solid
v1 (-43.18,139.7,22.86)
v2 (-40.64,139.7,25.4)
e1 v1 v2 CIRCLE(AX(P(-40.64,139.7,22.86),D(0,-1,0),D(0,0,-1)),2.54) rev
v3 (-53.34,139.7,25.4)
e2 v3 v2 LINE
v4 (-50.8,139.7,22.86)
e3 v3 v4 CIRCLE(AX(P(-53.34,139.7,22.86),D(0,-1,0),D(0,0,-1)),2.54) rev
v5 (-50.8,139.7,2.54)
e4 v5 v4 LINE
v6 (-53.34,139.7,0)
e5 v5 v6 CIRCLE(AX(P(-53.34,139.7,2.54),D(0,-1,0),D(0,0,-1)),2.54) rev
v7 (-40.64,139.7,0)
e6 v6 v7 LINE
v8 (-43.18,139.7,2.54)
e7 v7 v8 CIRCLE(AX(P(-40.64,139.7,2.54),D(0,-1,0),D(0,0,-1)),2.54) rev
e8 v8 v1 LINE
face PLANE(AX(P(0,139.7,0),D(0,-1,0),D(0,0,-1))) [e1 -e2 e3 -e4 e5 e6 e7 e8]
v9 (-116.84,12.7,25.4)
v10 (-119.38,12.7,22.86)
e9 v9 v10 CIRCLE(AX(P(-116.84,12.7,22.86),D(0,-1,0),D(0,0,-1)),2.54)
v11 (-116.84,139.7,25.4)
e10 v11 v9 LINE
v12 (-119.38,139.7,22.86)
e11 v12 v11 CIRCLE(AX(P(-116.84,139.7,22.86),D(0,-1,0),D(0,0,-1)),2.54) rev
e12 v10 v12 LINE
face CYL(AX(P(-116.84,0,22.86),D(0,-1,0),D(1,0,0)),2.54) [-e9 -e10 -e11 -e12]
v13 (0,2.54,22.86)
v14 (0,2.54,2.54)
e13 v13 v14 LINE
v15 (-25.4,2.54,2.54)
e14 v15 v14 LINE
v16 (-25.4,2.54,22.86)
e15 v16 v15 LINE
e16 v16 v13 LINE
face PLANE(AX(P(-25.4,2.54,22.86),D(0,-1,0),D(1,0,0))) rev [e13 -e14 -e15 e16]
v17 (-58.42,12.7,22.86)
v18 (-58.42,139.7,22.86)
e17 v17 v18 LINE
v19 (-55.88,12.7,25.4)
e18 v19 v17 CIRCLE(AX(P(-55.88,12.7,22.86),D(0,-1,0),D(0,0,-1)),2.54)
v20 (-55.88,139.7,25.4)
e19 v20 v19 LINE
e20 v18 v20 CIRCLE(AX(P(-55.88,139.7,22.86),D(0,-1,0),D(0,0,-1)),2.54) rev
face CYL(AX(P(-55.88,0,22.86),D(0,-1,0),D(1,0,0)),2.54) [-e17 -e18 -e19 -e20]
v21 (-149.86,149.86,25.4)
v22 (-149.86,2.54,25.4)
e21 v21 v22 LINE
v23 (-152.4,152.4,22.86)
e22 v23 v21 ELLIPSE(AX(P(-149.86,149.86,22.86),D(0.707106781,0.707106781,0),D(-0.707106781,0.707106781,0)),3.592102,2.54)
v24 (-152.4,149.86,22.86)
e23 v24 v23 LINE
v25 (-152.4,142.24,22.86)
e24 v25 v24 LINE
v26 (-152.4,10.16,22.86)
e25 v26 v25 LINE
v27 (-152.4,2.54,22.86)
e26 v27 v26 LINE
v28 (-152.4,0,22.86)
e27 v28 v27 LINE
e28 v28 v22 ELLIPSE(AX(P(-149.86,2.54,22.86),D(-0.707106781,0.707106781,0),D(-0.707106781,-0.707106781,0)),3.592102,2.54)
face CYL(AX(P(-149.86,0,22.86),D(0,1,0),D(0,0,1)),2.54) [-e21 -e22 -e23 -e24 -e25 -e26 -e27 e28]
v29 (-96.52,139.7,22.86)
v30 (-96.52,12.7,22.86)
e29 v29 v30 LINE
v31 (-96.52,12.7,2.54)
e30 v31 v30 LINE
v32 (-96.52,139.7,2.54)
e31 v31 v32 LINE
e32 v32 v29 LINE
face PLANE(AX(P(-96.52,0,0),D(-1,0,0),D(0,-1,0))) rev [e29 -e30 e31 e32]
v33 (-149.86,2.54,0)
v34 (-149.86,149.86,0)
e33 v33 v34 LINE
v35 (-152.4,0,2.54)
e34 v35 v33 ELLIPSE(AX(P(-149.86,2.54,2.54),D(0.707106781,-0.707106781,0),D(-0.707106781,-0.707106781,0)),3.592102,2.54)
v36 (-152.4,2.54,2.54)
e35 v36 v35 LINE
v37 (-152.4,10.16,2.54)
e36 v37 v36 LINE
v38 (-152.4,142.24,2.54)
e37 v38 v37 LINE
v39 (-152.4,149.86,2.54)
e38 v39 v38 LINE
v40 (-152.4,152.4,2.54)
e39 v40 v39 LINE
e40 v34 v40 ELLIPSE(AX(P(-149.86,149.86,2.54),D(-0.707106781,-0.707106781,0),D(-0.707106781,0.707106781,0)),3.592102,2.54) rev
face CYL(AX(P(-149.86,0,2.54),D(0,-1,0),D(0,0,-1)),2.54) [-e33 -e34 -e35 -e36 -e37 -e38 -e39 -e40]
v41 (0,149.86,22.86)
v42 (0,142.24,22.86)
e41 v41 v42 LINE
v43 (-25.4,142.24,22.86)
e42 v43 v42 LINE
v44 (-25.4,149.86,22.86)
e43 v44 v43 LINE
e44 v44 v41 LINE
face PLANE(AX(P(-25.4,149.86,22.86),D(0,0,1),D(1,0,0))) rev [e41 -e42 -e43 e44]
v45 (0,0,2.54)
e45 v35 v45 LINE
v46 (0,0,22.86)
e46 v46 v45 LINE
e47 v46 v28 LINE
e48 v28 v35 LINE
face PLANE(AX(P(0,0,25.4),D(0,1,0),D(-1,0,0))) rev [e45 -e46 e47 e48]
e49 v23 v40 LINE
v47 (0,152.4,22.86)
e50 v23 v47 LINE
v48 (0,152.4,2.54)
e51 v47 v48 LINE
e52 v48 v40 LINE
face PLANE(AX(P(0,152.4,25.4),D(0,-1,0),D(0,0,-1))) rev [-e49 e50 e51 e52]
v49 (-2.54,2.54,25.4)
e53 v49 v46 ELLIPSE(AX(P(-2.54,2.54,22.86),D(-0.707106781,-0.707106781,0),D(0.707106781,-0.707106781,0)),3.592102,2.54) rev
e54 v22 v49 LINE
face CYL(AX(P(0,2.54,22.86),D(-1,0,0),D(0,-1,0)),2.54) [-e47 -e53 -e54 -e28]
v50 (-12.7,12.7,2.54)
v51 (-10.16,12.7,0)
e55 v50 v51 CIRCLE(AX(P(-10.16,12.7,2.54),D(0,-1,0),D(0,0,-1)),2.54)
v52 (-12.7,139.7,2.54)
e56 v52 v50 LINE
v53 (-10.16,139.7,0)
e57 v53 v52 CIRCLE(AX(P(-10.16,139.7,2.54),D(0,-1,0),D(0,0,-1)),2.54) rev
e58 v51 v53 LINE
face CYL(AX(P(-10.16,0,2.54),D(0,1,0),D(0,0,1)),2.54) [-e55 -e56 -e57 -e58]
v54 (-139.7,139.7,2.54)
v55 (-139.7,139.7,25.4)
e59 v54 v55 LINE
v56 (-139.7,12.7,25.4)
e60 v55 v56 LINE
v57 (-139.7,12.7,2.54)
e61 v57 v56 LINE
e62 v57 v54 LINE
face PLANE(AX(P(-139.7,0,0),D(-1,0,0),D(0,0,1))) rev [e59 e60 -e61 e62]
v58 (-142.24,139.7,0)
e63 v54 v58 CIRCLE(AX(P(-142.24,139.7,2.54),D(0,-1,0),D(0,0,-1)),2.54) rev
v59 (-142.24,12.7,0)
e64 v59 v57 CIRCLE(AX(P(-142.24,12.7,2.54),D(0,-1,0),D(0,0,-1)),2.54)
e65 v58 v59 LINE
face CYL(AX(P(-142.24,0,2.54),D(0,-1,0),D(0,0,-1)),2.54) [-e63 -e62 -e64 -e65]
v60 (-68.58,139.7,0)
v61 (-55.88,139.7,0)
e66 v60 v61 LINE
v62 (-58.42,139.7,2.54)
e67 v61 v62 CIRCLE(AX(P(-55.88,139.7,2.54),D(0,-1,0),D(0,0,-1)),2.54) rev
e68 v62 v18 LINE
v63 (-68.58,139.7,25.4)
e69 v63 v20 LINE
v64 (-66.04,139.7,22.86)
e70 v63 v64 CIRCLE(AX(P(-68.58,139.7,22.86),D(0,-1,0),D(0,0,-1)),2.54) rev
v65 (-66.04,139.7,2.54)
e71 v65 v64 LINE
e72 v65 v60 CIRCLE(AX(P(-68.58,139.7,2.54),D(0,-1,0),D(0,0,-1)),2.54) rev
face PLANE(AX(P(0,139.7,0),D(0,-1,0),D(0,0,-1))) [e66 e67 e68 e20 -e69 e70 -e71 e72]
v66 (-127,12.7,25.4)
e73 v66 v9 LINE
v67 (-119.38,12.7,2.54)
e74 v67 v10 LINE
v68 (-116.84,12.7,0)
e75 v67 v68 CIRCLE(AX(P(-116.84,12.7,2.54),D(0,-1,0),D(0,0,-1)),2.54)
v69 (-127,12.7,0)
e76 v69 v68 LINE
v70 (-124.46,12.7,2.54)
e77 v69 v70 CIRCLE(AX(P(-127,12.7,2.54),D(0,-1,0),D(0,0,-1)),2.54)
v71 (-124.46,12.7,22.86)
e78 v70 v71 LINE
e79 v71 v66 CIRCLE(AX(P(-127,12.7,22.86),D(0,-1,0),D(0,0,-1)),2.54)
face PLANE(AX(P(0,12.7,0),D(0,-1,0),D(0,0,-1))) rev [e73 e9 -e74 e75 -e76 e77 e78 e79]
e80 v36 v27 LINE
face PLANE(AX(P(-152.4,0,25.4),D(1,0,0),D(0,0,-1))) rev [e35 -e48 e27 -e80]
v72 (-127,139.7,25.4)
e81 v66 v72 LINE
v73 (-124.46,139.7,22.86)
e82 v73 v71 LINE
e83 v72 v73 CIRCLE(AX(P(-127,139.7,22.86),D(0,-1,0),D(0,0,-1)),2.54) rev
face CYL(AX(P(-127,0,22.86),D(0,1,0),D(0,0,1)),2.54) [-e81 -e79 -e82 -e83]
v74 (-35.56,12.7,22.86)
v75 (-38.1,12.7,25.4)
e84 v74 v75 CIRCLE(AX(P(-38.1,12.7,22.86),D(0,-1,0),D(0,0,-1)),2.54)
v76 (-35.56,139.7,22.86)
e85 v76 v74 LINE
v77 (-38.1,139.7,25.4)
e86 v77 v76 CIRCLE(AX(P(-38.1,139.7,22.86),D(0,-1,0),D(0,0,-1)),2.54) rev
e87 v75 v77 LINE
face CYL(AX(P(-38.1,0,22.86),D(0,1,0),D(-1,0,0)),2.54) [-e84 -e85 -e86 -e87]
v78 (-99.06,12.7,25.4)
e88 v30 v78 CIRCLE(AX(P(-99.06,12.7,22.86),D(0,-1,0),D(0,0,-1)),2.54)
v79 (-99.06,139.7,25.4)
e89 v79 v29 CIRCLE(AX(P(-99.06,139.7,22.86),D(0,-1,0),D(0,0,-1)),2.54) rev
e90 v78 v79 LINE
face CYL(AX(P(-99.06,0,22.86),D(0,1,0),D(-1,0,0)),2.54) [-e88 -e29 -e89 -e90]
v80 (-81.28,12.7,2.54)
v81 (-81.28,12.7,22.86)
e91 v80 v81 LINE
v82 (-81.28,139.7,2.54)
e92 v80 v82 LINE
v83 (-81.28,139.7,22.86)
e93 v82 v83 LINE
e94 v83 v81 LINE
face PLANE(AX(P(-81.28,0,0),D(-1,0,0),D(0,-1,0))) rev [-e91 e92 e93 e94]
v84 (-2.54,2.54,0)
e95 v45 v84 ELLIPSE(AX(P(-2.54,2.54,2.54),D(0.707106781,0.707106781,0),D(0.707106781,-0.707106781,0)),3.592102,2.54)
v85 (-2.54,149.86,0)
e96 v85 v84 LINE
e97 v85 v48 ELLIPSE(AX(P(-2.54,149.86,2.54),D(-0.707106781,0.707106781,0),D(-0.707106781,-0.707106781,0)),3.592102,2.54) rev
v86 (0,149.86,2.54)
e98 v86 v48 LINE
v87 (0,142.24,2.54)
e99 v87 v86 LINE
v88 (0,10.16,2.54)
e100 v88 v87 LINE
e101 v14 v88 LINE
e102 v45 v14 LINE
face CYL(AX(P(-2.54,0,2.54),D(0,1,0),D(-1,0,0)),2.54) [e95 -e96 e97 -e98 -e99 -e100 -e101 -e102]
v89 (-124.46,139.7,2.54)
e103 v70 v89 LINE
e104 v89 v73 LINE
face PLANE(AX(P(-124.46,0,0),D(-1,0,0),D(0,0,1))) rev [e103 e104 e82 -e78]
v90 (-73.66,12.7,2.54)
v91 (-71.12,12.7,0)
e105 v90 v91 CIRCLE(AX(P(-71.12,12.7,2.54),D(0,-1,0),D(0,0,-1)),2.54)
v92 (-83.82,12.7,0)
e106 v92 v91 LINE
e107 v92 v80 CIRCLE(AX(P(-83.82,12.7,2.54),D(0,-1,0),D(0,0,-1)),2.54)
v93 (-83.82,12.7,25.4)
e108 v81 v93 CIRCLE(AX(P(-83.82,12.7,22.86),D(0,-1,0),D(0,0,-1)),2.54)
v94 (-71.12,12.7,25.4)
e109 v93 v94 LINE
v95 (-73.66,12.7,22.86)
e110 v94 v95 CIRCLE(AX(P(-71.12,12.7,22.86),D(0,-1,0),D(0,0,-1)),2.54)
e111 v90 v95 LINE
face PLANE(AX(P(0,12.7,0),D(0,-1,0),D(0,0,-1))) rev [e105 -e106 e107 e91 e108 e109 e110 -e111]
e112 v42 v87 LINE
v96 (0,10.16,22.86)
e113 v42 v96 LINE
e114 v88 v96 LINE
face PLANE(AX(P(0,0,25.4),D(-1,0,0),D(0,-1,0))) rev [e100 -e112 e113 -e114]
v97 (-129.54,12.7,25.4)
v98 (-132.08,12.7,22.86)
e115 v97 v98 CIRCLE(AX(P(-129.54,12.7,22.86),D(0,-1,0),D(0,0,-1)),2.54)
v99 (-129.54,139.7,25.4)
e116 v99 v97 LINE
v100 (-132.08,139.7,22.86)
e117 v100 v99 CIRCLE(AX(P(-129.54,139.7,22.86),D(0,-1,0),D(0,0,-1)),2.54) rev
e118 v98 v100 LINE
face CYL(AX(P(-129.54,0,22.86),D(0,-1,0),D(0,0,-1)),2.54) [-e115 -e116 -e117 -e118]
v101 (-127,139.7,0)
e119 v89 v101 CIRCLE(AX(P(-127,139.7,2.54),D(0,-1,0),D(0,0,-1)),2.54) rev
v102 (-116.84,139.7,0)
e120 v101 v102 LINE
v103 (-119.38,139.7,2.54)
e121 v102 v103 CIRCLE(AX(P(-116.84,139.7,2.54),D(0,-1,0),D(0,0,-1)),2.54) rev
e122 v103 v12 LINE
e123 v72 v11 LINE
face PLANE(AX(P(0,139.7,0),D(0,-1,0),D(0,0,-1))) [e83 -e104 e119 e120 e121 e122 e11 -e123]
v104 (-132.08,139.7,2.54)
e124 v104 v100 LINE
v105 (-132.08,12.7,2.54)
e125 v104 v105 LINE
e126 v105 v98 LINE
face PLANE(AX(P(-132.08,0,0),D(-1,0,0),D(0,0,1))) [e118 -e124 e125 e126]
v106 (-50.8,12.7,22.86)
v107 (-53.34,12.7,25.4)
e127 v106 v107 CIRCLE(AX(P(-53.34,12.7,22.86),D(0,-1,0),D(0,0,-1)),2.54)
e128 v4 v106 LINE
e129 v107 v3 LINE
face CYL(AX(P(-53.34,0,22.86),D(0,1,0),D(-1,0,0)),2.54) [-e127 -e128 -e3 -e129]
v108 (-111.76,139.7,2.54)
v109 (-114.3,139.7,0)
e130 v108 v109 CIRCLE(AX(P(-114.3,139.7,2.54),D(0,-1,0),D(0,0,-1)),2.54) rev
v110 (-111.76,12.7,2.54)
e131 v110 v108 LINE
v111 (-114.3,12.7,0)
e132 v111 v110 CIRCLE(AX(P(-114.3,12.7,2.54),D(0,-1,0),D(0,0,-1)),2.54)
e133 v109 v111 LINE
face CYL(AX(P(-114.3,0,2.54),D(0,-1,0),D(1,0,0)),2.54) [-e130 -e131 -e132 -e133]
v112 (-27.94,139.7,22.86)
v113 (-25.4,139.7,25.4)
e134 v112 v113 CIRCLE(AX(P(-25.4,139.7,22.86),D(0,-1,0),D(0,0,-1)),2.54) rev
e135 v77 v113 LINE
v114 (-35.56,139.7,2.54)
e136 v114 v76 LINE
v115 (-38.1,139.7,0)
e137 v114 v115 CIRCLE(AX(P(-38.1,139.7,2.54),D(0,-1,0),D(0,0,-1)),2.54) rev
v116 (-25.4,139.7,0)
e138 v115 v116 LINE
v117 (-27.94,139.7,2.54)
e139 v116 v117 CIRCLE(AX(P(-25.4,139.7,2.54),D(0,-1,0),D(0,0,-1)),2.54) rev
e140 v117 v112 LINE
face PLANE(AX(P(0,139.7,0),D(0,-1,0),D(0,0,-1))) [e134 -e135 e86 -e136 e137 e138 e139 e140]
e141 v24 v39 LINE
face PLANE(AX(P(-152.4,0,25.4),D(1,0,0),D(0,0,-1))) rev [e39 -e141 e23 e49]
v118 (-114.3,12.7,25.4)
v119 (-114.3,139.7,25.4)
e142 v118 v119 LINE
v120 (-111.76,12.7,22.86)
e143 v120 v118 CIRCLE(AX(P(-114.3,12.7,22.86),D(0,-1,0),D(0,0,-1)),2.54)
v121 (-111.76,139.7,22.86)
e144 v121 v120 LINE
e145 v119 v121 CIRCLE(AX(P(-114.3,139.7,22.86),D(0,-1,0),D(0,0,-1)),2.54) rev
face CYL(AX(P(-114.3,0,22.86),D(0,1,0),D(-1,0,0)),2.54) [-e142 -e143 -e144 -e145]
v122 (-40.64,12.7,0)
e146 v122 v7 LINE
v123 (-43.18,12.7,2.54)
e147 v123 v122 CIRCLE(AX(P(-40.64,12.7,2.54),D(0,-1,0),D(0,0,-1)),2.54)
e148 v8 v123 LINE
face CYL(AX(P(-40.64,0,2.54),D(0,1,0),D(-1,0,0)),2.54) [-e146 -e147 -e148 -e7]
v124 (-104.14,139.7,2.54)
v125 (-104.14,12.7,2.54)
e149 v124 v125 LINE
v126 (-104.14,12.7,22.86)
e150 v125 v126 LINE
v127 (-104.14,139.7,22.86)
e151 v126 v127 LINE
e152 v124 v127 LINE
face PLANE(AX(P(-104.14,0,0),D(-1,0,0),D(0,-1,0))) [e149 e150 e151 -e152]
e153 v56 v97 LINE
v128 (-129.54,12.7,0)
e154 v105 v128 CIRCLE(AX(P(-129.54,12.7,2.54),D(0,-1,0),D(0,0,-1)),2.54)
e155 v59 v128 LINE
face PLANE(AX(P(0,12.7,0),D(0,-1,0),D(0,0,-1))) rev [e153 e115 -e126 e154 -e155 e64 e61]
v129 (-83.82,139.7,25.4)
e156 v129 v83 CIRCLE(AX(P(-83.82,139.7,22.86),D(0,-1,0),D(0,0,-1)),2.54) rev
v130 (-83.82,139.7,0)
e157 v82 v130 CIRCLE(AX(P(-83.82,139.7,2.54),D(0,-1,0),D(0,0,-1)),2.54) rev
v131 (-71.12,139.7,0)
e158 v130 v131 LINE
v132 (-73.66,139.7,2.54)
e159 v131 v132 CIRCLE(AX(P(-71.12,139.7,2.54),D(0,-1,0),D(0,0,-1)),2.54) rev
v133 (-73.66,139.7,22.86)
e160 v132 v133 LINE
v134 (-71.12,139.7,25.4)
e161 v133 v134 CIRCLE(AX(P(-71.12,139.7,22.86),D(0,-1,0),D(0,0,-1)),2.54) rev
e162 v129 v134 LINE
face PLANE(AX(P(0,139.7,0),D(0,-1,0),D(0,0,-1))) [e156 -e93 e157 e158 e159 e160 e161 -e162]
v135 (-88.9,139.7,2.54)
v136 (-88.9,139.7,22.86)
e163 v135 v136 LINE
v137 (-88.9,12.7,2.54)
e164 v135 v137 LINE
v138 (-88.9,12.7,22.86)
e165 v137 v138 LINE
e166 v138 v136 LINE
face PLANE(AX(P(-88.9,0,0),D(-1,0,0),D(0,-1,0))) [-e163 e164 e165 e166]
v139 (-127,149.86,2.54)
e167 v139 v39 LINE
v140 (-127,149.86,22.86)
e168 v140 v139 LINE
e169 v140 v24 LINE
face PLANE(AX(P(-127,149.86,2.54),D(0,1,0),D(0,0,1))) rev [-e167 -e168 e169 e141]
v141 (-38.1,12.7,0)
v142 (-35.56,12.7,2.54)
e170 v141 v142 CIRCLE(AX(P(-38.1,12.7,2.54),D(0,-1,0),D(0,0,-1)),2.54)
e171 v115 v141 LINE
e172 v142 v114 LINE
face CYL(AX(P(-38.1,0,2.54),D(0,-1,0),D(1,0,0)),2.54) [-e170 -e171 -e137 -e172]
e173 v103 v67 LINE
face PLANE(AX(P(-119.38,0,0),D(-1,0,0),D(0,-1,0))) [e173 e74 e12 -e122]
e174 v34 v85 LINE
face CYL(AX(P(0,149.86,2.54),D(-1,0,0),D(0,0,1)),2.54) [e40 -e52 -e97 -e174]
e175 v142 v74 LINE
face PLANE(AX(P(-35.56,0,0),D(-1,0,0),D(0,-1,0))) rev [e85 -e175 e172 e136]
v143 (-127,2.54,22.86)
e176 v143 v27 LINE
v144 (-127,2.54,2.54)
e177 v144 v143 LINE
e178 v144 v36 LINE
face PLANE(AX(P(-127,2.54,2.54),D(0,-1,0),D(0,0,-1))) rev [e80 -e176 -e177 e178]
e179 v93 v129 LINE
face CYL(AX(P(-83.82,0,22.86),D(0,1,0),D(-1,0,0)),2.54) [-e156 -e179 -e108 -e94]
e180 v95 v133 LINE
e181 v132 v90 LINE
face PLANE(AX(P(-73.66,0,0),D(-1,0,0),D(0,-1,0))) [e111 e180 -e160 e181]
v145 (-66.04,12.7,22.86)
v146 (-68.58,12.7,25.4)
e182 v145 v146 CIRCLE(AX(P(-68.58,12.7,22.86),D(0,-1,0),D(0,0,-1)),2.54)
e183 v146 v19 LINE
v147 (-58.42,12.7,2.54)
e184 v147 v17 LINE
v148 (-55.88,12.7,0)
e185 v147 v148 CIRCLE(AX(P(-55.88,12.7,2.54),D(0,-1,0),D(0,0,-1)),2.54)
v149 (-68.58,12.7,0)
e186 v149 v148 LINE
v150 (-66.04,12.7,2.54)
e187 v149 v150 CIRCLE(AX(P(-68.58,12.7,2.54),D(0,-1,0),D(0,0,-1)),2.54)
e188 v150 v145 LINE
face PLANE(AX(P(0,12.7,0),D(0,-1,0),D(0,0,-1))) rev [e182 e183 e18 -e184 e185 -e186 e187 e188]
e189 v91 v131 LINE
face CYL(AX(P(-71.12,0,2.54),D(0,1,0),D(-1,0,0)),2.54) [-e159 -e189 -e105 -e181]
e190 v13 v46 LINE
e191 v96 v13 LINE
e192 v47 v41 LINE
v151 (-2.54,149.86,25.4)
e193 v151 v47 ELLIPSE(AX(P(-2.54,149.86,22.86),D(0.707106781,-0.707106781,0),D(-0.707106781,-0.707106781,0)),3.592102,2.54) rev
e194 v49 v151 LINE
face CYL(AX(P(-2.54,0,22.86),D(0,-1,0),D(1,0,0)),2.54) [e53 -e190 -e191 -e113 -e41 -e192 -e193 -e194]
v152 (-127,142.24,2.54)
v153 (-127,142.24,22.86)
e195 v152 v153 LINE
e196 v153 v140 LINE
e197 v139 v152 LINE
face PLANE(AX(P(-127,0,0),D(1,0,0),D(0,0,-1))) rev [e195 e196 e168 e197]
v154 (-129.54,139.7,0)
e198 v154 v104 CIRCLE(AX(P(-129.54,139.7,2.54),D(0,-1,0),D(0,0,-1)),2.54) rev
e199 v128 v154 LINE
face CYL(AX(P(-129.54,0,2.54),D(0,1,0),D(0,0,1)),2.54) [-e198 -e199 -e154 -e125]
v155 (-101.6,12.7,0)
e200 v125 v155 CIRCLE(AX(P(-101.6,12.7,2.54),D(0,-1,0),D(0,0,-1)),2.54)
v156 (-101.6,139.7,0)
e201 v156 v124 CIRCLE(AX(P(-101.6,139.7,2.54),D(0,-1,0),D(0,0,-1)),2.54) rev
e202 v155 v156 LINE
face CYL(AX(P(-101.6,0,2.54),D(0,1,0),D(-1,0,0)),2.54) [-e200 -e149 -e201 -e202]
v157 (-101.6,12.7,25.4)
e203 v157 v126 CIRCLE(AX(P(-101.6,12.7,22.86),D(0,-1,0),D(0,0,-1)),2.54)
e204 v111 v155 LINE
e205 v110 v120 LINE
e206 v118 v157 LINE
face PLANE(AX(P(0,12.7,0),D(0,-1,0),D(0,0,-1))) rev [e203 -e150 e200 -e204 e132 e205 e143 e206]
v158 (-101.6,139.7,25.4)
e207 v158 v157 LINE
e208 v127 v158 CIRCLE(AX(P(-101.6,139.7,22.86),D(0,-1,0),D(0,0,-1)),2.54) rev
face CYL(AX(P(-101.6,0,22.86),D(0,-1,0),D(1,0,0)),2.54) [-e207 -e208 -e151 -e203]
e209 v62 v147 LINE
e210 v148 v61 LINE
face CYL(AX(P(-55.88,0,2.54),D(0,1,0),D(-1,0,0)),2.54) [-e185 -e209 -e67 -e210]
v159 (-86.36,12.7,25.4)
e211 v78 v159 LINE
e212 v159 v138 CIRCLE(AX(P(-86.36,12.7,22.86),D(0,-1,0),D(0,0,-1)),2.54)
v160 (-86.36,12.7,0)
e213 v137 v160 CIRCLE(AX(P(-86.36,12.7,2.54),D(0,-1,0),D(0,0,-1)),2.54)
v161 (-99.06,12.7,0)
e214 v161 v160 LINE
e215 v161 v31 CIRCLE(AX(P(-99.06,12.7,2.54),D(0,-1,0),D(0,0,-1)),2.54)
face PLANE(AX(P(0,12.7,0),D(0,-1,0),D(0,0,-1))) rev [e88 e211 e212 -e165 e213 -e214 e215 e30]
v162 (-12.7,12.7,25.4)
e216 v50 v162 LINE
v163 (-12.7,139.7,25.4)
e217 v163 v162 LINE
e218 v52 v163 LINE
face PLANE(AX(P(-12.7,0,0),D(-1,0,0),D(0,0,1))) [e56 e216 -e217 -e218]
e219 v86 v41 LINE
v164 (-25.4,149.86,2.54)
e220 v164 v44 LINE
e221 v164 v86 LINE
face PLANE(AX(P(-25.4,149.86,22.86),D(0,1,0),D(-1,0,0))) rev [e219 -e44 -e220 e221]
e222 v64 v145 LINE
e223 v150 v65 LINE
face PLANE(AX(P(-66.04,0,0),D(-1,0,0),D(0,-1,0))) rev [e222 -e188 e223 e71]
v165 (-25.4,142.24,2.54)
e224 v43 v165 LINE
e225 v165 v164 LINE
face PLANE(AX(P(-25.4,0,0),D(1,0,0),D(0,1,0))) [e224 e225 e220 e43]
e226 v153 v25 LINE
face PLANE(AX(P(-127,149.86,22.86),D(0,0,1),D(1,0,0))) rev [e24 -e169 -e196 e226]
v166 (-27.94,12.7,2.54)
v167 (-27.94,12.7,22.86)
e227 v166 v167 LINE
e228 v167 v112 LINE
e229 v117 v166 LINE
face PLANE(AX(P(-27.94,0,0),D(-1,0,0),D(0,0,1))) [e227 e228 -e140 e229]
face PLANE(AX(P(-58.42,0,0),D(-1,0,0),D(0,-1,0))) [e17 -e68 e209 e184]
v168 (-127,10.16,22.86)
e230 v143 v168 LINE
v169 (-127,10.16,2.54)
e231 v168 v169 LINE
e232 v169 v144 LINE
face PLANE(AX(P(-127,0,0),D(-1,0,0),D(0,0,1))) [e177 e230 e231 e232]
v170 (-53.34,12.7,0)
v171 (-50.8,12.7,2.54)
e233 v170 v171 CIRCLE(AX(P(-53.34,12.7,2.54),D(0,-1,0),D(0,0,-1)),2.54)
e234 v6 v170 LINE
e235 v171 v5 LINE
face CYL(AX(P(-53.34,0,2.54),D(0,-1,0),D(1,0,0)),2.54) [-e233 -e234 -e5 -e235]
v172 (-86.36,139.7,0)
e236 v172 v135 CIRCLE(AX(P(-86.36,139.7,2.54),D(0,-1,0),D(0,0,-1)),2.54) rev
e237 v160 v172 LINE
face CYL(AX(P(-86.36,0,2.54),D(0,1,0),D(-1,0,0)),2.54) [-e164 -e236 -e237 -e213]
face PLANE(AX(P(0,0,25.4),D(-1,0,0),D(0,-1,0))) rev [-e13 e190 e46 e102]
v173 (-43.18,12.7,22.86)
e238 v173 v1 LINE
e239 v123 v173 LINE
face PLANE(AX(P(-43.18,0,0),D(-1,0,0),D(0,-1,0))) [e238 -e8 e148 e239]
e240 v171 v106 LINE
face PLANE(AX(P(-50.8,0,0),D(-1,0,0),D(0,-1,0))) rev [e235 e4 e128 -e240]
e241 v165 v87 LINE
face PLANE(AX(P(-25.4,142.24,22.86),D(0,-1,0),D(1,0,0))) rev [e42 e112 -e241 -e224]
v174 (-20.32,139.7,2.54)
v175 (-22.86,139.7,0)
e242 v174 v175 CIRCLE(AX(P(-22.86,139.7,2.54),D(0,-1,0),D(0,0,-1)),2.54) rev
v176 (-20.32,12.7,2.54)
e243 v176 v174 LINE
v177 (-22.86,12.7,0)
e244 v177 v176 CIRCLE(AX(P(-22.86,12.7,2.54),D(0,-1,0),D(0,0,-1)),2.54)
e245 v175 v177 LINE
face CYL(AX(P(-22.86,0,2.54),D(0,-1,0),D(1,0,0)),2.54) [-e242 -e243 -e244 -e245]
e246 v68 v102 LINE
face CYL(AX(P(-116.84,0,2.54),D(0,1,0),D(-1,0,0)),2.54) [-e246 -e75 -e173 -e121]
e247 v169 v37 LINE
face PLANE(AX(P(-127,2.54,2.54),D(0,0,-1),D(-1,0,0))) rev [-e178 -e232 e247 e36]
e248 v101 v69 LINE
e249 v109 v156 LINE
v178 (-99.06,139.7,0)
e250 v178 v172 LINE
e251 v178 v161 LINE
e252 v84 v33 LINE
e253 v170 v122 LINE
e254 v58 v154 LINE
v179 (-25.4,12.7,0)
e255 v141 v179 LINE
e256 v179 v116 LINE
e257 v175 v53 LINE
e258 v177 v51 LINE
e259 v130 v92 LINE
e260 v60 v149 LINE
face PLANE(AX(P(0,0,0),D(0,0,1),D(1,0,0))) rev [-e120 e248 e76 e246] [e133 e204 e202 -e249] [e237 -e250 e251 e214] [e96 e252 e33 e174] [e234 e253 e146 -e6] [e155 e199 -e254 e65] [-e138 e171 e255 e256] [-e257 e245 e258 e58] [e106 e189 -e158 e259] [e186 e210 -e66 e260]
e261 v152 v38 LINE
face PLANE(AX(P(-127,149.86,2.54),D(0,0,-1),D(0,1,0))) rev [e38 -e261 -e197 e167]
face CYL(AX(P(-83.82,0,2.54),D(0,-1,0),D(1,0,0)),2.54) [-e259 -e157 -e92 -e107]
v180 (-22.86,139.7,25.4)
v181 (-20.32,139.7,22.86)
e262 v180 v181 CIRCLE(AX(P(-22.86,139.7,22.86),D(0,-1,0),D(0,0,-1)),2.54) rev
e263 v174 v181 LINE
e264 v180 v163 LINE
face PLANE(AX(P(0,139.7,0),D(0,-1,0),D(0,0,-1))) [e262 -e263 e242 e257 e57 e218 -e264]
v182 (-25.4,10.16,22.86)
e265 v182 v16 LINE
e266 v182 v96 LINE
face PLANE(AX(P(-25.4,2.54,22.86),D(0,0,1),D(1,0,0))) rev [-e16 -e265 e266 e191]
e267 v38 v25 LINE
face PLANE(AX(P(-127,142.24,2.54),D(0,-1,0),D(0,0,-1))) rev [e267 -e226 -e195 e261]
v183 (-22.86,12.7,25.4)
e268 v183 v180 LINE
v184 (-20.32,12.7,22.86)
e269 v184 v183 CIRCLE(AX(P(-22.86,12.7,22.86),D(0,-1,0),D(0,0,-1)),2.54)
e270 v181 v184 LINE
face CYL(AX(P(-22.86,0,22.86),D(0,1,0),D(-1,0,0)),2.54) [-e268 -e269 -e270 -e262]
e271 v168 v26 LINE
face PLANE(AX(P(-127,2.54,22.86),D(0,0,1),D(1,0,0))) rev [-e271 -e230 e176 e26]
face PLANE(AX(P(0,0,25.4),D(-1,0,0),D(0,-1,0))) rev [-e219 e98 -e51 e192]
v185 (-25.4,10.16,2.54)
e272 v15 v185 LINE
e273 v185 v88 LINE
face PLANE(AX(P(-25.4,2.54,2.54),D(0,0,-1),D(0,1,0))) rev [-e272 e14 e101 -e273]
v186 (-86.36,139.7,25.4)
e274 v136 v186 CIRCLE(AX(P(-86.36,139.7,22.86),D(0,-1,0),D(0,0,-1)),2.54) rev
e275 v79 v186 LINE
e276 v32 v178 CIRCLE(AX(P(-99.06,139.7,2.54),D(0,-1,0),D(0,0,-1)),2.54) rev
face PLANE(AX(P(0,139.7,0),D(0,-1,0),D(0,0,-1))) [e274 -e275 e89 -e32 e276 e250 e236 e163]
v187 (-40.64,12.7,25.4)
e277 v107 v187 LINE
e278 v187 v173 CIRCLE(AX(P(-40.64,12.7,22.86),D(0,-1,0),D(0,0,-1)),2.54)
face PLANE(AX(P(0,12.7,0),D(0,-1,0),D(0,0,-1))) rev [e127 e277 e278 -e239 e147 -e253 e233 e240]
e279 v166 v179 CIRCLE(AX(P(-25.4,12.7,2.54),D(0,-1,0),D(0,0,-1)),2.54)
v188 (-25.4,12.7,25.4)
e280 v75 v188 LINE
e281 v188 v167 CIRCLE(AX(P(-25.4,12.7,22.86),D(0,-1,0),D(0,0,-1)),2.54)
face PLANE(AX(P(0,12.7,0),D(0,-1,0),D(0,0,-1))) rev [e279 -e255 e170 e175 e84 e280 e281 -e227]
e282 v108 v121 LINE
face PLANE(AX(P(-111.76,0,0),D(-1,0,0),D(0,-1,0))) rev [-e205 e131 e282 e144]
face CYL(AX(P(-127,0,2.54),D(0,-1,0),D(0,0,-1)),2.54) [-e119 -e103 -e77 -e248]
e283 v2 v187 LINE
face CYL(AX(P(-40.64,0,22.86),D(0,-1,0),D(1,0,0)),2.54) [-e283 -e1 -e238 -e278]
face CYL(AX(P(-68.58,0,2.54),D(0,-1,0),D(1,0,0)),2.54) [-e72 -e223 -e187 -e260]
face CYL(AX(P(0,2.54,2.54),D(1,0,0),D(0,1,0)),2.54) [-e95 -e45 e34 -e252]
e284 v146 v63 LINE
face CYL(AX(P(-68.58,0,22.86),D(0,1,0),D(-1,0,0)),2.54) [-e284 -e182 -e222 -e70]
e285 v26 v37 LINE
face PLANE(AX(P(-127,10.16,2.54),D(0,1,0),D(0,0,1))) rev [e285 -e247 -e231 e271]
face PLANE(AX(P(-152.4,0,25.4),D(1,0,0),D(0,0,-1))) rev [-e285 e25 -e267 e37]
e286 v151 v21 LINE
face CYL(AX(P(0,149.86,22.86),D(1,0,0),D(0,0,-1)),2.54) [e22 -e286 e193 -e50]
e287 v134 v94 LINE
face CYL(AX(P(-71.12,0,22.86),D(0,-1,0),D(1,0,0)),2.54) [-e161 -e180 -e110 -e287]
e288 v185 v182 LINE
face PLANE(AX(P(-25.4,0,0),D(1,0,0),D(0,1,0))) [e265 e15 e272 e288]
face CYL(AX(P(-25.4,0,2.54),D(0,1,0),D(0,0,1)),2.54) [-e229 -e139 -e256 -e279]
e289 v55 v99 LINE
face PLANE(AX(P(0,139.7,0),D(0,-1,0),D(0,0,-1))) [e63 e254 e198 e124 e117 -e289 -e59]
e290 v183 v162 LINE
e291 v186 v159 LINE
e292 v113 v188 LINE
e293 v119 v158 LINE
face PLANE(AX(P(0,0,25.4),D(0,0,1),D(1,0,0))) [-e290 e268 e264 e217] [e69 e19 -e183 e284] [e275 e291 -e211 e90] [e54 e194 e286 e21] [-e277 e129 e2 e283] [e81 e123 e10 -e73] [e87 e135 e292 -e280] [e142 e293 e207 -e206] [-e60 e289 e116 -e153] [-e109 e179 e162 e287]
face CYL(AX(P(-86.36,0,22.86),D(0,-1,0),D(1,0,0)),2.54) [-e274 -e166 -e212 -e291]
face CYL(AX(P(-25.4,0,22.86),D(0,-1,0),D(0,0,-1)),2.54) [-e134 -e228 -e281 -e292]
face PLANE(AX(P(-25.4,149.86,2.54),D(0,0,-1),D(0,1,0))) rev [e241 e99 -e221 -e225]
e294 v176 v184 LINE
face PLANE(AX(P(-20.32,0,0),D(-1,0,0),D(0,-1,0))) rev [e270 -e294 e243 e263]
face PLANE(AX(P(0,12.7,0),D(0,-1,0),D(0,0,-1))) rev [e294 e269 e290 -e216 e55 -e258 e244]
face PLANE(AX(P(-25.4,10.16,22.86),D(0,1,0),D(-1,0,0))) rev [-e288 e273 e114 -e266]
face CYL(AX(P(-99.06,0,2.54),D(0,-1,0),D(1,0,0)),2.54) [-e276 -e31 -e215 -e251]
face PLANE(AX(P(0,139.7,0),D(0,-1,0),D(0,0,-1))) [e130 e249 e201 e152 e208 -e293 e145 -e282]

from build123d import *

# Parameters (mm, degrees)
SKETCH1_W           = 152.4
SKETCH1_H           = 152.4
BOSS_EXTRUDE1_DEPTH = 25.4
SKETCH7_W           = 20.32
SKETCH7_H           = 7.62
CUT_EXTRUDE4_DEPTH  = 25.4
SKETCH8_W           = 20.32
SKETCH8_H           = 7.62
CUT_EXTRUDE5_DEPTH  = 25.4
SKETCH9_W           = 7.62
SKETCH9_H           = 127
SKETCH9_W_2         = 5.08
CUT_EXTRUDE6_DEPTH  = 25.4
FILLET3_R           = 2.54
FILLET4_R           = 2.54
FILLET5_DEPTH       = 152.4
FILLET5_START       = -153
FILLET5_2_DEPTH     = 154
FILLET6_R           = 2.54
SKETCH11_W          = 20.32
SKETCH11_H          = 7.62
CUT_EXTRUDE8_DEPTH  = 25.4
SKETCH12_W          = 20.32
SKETCH12_H          = 7.62
CUT_EXTRUDE9_DEPTH  = 25.4


with BuildPart() as part:
    # Sketch1 → Boss-Extrude1 (new body)
    with BuildSketch(Plane.XY):
        with Locations((-76.2, 76.2)):
            Rectangle(SKETCH1_W, SKETCH1_H)
    extrude(amount=BOSS_EXTRUDE1_DEPTH)

    # Sketch7 → Cut-Extrude4 (cut)
    with BuildSketch(Plane(origin=(0, 0, 0), x_dir=(0, 0, -1), z_dir=(1, 0, 0))):
        with Locations((-12.7, 146.05)):
            Rectangle(SKETCH7_W, SKETCH7_H)
    extrude(amount=-CUT_EXTRUDE4_DEPTH, mode=Mode.SUBTRACT)

    # Sketch8 → Cut-Extrude5 (cut)
    with BuildSketch(Plane(origin=(0, 0, 0), x_dir=(0, 0, -1), z_dir=(1, 0, 0))):
        with Locations((-12.7, 6.35)):
            Rectangle(SKETCH8_W, SKETCH8_H)
    extrude(amount=-CUT_EXTRUDE5_DEPTH, mode=Mode.SUBTRACT)

    # Sketch9 → Cut-Extrude6 (cut)
    with BuildSketch(Plane.XY.offset(25.4)):
        with Locations((-135.89, 76.2)):
            Rectangle(SKETCH9_W, SKETCH9_H)
        with Locations((-121.92, 76.2)):
            Rectangle(SKETCH9_W_2, SKETCH9_H)
        with Locations((-107.95, 76.2)):
            Rectangle(SKETCH9_W, SKETCH9_H)
        with Locations((-92.71, 76.2)):
            Rectangle(SKETCH9_W, SKETCH9_H)
        with Locations((-77.47, 76.2)):
            Rectangle(SKETCH9_W, SKETCH9_H)
        with Locations((-62.23, 76.2)):
            Rectangle(SKETCH9_W, SKETCH9_H)
        with Locations((-46.99, 76.2)):
            Rectangle(SKETCH9_W, SKETCH9_H)
        with Locations((-31.75, 76.2)):
            Rectangle(SKETCH9_W, SKETCH9_H)
        with Locations((-16.51, 76.2)):
            Rectangle(SKETCH9_W, SKETCH9_H)
    extrude(amount=-CUT_EXTRUDE6_DEPTH, mode=Mode.SUBTRACT)

    # Fillet3
    fillet3_edges = [part.edges().sort_by_distance(p)[0] for p in [
        (-73.66, 76.2, 25.4),
        (-81.28, 76.2, 25.4),
        (-58.42, 76.2, 25.4),
        (-66.04, 76.2, 25.4),
        (-43.18, 76.2, 25.4),
        (-50.8, 76.2, 25.4),
        (-27.94, 76.2, 25.4),
        (-35.56, 76.2, 25.4),
        (-20.32, 76.2, 25.4),
        (-132.08, 76.2, 25.4),
        (-119.38, 76.2, 25.4),
        (-124.46, 76.2, 25.4),
        (-104.14, 76.2, 25.4),
        (-111.76, 76.2, 25.4),
        (-88.9, 76.2, 25.4),
        (-96.52, 76.2, 25.4),
    ]]
    fillet(fillet3_edges, radius=FILLET3_R)

    # Fillet4
    fillet4_edges = [part.edges().sort_by_distance(p)[0] for p in [
        (-81.28, 76.2, 0),
        (-73.66, 76.2, 0),
        (-66.04, 76.2, 0),
        (-58.42, 76.2, 0),
        (-50.8, 76.2, 0),
        (-43.18, 76.2, 0),
        (-35.56, 76.2, 0),
        (-27.94, 76.2, 0),
        (-20.32, 76.2, 0),
        (-12.7, 76.2, 0),
        (-139.7, 76.2, 0),
        (-132.08, 76.2, 0),
        (-124.46, 76.2, 0),
        (-119.38, 76.2, 0),
        (-111.76, 76.2, 0),
        (-104.14, 76.2, 0),
        (-96.52, 76.2, 0),
        (-88.9, 76.2, 0),
    ]]
    fillet(fillet4_edges, radius=FILLET4_R)

    # Fillet5: read off the stored shape, not the designer's step
    # Fillet5 outline → Fillet5 (cut)
    with BuildSketch(Plane(origin=(0, 0, 0), x_dir=(1, 0, 0), z_dir=(0, 1, 0))):
        with BuildLine():
            Line((-152.4, 0), (-152.4, -2.54))
            ThreePointArc((-152.4, -2.54), (-151.656051224, -0.743948776), (-149.86, 0))
            Line((-149.86, 0), (-152.4, 0))
        make_face()
        with BuildLine():
            Line((0, 0), (-2.54, 0))
            ThreePointArc((-2.54, 0), (-0.743948776, -0.743948776), (0, -2.54))
            Line((0, -2.54), (0, 0))
        make_face()
    extrude(amount=FILLET5_DEPTH, mode=Mode.SUBTRACT)

    # Fillet5 2 outline → Fillet5 2 (cut)
    with BuildSketch(Plane.YZ.offset(FILLET5_START)):
        with BuildLine():
            ThreePointArc((152.4, 2.54), (151.656051224, 0.743948776), (149.86, 0))
            Line((149.86, 0), (152.4, 0))
            Line((152.4, 0), (152.4, 2.54))
        make_face()
        with BuildLine():
            ThreePointArc((2.54, 0), (0.743948776, 0.743948776), (0, 2.54))
            Line((0, 2.54), (0, 0))
            Line((0, 0), (2.54, 0))
        make_face()
    extrude(amount=FILLET5_2_DEPTH, mode=Mode.SUBTRACT)

    # Fillet6
    fillet6_edges = [part.edges().sort_by_distance(p)[0] for p in [
        (-152.4, 76.2, 25.4),
        (-76.2, 0, 25.4),
        (0, 76.2, 25.4),
        (-76.2, 152.4, 25.4),
    ]]
    fillet(fillet6_edges, radius=FILLET6_R - 0.0001)  # a hair under: the kernel refuses the full size

    # Sketch11 → Cut-Extrude8 (cut)
    with BuildSketch(Plane.ZY.offset(152.4)):
        with Locations((12.7, 146.05)):
            Rectangle(SKETCH11_W, SKETCH11_H)
    extrude(amount=-CUT_EXTRUDE8_DEPTH, mode=Mode.SUBTRACT)

    # Sketch12 → Cut-Extrude9 (cut)
    with BuildSketch(Plane.ZY.offset(152.4)):
        with Locations((12.7, 6.35)):
            Rectangle(SKETCH12_W, SKETCH12_H)
    extrude(amount=-CUT_EXTRUDE9_DEPTH, mode=Mode.SUBTRACT)


solid = part.part
